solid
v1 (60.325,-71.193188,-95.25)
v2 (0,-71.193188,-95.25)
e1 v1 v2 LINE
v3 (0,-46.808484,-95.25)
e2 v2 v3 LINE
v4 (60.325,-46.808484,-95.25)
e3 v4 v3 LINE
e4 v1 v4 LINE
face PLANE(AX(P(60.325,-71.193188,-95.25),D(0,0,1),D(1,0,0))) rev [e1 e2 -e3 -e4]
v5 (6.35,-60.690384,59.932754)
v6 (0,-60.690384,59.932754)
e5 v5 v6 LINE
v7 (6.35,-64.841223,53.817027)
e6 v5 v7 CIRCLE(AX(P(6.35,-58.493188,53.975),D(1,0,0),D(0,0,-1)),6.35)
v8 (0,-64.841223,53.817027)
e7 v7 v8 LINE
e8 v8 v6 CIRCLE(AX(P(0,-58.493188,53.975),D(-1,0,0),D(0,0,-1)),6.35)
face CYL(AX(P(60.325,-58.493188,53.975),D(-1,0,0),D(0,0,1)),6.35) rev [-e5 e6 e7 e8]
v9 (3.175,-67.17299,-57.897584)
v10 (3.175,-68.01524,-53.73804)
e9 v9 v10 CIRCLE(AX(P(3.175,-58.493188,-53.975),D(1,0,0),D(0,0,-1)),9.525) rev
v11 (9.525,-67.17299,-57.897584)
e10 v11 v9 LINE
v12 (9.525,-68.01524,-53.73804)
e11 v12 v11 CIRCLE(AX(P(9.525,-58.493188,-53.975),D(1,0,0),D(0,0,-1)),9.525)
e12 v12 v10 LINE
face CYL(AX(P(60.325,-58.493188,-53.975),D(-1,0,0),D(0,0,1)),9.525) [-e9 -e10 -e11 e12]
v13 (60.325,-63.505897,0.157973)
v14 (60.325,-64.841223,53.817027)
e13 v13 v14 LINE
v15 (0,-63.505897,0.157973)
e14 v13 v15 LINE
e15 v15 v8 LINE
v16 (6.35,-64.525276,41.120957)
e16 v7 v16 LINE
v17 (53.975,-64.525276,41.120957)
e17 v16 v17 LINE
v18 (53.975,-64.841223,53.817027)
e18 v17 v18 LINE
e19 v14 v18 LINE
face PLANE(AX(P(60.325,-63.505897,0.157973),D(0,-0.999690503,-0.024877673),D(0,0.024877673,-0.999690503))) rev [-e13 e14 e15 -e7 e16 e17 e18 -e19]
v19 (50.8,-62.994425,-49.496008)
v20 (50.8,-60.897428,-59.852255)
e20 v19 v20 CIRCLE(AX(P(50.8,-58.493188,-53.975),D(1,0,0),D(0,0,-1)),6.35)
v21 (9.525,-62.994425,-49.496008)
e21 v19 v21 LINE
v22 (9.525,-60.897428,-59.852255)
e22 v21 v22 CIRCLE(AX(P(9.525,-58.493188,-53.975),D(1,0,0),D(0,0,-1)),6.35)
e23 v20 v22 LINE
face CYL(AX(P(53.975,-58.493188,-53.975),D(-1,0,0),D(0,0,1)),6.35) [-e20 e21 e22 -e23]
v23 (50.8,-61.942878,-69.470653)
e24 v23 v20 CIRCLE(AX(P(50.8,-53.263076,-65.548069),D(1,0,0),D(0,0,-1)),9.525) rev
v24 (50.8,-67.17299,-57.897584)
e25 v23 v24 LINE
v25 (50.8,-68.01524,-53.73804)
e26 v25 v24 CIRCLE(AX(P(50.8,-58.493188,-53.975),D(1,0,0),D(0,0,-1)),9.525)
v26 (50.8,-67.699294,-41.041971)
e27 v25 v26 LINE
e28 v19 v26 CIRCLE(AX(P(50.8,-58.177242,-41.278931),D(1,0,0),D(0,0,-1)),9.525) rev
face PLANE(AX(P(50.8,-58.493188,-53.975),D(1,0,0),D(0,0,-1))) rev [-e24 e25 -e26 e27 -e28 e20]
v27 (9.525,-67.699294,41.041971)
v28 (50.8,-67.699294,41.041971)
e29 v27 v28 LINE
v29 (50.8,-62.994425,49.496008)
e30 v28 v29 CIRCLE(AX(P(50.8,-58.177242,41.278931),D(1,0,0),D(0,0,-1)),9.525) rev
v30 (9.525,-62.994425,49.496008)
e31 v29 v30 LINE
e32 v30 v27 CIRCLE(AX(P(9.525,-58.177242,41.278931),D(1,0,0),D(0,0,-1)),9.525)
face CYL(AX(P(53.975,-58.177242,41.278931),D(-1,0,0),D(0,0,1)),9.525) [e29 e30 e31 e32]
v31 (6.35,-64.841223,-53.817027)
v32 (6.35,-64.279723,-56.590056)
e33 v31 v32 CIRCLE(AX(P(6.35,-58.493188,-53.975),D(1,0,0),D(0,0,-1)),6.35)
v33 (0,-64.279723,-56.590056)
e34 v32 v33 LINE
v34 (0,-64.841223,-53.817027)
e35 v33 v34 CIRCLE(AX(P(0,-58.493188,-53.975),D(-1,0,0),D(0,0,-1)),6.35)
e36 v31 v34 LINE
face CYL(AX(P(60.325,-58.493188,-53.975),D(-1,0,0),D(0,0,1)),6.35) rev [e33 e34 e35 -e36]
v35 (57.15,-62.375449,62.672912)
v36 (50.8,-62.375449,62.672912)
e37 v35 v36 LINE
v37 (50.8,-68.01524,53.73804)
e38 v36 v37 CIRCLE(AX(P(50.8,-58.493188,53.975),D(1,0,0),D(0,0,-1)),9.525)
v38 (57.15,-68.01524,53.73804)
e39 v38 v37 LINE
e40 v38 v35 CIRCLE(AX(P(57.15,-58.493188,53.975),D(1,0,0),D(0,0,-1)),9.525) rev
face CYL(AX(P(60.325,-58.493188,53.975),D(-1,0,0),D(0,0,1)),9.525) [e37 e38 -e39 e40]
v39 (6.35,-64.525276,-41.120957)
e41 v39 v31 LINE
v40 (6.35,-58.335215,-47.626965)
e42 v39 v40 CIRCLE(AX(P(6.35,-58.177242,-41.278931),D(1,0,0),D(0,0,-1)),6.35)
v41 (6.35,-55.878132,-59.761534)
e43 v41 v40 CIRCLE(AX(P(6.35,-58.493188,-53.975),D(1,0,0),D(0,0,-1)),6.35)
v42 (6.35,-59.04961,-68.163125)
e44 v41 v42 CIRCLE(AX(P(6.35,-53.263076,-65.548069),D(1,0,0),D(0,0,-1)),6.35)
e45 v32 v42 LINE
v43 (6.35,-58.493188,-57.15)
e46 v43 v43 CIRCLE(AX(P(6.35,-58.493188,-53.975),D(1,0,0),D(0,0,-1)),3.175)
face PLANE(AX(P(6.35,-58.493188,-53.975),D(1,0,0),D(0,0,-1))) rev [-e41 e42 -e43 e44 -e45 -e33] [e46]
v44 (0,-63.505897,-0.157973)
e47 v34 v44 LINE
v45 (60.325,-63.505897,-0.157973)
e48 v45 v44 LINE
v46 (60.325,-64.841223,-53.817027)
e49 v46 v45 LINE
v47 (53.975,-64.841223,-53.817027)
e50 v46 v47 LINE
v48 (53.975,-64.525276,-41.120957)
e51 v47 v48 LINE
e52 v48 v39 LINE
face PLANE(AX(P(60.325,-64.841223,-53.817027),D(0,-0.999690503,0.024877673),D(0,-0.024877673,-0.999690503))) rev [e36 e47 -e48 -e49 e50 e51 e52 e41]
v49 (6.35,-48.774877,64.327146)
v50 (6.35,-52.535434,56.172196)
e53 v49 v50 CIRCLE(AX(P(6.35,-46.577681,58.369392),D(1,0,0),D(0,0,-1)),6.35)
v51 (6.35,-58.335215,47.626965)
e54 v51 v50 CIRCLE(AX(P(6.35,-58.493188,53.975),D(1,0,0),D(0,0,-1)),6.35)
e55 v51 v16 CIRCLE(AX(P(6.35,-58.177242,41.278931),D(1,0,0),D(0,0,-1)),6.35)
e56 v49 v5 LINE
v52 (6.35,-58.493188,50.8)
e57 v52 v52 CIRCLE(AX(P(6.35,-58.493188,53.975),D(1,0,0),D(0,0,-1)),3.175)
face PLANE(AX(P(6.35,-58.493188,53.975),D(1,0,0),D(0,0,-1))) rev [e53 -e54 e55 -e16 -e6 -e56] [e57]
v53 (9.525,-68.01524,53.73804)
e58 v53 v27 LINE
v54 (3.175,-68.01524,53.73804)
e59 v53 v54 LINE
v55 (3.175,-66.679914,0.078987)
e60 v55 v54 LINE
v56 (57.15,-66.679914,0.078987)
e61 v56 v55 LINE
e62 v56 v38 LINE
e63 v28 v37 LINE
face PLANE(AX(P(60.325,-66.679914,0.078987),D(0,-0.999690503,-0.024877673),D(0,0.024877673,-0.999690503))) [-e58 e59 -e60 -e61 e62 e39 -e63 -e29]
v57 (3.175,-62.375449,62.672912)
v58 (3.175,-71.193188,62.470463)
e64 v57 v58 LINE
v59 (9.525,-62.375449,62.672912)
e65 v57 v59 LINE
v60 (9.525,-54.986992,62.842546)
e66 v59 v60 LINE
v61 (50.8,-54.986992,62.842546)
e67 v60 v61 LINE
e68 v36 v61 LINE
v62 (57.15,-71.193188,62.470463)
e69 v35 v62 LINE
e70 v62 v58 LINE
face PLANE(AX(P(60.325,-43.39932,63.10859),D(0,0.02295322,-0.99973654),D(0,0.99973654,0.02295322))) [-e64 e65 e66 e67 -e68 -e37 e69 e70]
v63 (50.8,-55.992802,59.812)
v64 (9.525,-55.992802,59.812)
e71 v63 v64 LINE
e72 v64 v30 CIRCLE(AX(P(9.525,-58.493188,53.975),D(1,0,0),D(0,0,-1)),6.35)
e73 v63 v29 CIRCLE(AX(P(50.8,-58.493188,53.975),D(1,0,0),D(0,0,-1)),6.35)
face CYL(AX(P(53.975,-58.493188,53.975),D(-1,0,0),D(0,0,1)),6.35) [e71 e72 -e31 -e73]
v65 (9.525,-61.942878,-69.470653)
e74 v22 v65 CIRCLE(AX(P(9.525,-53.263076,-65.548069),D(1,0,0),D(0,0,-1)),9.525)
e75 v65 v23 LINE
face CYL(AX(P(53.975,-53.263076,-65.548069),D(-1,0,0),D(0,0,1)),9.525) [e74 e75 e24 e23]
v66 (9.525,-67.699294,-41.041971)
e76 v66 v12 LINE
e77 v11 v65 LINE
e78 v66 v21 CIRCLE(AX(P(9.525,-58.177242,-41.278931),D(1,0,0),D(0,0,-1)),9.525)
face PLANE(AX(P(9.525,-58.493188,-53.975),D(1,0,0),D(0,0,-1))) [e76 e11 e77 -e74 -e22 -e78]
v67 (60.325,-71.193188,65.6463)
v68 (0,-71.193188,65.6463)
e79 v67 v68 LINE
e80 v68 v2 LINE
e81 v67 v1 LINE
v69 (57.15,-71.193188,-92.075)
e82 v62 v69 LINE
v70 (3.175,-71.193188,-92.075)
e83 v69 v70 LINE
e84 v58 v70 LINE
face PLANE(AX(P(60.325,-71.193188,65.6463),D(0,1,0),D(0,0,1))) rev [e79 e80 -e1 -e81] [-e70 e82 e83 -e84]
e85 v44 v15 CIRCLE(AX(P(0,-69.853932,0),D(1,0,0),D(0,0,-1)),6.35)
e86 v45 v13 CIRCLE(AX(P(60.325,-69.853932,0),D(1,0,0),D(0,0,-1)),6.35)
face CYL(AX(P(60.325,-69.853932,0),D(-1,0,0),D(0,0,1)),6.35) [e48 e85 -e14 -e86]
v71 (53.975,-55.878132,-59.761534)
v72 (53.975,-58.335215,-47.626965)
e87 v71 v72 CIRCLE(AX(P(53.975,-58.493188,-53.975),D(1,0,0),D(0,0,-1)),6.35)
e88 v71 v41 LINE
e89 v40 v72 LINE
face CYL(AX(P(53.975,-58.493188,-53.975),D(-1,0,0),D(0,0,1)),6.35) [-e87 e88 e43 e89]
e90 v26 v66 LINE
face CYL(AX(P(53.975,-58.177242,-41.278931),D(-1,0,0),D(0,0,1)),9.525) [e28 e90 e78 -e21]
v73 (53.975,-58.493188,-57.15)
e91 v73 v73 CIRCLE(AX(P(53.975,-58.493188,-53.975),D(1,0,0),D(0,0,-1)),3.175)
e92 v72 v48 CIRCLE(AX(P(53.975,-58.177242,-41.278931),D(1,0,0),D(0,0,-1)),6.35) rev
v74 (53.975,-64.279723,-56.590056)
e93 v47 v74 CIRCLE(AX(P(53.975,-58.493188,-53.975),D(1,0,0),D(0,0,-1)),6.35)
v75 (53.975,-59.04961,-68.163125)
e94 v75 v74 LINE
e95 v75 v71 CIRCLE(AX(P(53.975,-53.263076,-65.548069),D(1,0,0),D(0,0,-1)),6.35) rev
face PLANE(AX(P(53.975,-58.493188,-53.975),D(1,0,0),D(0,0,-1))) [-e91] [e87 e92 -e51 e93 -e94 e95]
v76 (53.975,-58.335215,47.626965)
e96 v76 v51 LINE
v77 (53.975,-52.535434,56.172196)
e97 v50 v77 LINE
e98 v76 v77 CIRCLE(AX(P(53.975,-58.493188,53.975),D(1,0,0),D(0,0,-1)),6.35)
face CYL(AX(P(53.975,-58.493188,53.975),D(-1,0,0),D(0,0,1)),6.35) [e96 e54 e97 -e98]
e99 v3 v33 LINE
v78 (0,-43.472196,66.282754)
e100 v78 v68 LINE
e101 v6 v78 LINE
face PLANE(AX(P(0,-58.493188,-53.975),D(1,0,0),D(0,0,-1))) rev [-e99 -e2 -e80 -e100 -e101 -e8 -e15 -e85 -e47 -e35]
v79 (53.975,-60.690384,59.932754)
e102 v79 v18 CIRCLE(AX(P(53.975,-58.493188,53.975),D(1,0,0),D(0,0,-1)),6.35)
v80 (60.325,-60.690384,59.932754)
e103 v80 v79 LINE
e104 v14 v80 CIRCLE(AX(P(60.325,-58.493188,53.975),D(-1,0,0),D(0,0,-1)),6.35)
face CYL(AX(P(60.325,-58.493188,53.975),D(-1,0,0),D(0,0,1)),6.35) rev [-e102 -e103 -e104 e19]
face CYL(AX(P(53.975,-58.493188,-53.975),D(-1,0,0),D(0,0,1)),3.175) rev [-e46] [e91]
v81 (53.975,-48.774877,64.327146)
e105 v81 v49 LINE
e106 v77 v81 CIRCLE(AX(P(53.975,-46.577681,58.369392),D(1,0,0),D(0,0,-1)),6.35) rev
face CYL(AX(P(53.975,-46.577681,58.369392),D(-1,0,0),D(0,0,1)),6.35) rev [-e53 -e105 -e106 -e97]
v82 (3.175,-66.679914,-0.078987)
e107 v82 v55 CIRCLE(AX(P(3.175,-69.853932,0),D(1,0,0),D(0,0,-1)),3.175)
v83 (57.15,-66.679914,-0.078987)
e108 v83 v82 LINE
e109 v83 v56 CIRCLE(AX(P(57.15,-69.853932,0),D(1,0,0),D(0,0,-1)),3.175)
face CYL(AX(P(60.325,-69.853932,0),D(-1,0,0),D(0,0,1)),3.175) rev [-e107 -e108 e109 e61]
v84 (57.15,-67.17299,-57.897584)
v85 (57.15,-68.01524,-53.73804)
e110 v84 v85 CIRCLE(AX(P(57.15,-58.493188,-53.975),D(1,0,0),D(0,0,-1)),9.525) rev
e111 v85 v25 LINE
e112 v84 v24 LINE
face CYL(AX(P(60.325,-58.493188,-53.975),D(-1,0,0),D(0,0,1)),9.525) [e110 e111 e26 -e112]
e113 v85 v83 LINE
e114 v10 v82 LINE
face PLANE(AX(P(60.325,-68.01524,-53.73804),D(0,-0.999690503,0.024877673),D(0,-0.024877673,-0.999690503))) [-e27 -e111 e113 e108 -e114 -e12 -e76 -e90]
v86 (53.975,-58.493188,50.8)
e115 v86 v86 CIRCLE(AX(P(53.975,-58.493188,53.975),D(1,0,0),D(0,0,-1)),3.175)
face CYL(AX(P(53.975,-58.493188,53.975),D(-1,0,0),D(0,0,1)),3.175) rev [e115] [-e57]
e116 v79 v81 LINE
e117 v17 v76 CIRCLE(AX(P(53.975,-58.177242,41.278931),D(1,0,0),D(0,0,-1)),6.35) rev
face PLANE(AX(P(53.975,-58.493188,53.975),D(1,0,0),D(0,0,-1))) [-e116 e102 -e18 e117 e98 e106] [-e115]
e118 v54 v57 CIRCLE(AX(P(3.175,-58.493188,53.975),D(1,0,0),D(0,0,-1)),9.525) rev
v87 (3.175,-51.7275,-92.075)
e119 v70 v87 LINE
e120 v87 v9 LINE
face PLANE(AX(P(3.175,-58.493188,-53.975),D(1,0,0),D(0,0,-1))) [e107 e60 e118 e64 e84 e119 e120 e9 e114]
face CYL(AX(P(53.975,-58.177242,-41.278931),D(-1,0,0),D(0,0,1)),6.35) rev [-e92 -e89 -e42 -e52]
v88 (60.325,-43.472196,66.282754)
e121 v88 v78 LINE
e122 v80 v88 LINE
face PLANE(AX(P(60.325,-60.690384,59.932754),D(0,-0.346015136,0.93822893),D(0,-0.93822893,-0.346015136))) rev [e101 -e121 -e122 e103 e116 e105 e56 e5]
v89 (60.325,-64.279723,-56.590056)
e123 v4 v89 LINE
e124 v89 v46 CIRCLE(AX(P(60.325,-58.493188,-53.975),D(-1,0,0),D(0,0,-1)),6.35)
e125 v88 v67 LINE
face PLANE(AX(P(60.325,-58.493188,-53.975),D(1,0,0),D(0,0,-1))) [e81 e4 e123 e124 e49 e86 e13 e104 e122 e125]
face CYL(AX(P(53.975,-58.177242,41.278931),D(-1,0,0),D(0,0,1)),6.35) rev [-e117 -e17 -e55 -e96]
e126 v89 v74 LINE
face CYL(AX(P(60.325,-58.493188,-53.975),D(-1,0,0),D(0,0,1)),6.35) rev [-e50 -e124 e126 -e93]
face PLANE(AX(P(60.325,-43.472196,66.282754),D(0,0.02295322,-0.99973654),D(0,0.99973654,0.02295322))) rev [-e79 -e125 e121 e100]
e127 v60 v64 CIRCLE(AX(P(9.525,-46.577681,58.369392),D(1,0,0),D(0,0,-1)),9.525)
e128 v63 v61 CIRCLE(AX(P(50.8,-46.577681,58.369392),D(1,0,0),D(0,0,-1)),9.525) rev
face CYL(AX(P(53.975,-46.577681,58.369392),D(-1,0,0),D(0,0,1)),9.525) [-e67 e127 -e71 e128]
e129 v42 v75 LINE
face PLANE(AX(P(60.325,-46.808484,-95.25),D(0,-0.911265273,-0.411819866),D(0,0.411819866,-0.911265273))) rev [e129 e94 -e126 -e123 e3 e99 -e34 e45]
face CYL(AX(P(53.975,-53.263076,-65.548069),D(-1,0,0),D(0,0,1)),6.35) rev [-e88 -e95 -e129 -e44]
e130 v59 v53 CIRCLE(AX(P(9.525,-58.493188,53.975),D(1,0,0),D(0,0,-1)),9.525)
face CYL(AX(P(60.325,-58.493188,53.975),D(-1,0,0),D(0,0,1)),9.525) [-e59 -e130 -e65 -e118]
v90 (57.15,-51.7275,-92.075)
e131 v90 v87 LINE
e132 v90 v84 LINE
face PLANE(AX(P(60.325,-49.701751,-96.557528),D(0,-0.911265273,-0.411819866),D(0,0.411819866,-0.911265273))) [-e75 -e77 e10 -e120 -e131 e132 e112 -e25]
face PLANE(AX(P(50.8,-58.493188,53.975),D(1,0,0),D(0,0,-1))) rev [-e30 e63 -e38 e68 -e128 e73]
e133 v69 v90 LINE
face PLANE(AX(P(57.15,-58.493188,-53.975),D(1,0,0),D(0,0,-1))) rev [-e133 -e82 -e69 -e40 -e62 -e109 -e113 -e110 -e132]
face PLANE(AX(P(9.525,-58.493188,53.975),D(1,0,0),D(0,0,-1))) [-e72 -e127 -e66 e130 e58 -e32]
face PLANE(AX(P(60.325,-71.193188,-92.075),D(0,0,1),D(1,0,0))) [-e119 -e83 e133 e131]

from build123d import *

# Parameters (mm, degrees)
BOSS_EXTRUDE1_DEPTH = 60.324999999999996
SKETCH2_R           = 6.349999999999996
SKETCH2_R_2         = 3.174999999999997
SKETCH2_R_3         = 6.350000000000003
BOSS_EXTRUDE2_DEPTH = 23.8125
FILLET1_R           = 6.35
SHELL1_START        = 3.175
SHELL1_DEPTH        = 53.975
SHELL1_START_2      = 9.525
SHELL1_2_DEPTH      = 41.275


# Read off the part's stored shape, not the designer's step: Shell1
with BuildPart() as part:
    # Sketch1 → Boss-Extrude1 (new body)
    with BuildSketch(Plane(origin=(0, 0, 0), x_dir=(0, 0, -1), z_dir=(1, 0, 0))):
        with BuildLine():
            Line((95.25, -46.808484128263686), (56.59005614988863, -64.27972260468273))
            ThreePointArc((56.59005614988863, -64.27972260468273), (55.235212183230196, -64.71688198003586), (53.81702677554687, -64.84122281357011))
            Line((53.81702677554687, -64.84122281357011), (0.1579732244523257, -63.50589713864123))
            ThreePointArc((0.1579732244523257, -63.50589713864123), (-7.8219e-13, -63.5039318313911), (-0.15797322445388826, -63.50589713864123))
            Line((-0.15797322445388826, -63.50589713864123), (-53.817026775546886, -64.84122281357013))
            ThreePointArc((-53.817026775546886, -64.84122281357013), (-57.54105224821803, -63.747307586818266), (-59.93275370705406, -60.69038423543624))
            Line((-59.93275370705406, -60.69038423543624), (-66.28275370705404, -43.47219611461599))
            Line((-66.28275370705404, -43.47219611461599), (-65.6463, -71.1931881208203))
            Line((-65.6463, -71.1931881208203), (95.25, -71.19318812082028))
            Line((95.25, -71.19318812082028), (95.25, -46.808484128263686))
        make_face()
    extrude(amount=BOSS_EXTRUDE1_DEPTH)

    # Sketch2 → Boss-Extrude2 (add, symmetric)
    # profile 1 of 2: a face of its own
    with BuildSketch(Plane(origin=(30.162499999999998, 0, 0), x_dir=(0, 0, -1), z_dir=(1, 0, 0))):
        with Locations((-53.975, -58.49318812082027)):
            Circle(SKETCH2_R)
        with Locations((-53.975, -58.49318812082027)):
            Circle(SKETCH2_R_2, mode=Mode.SUBTRACT)
    # profile 2 of 2: a face of its own
    with BuildSketch(Plane(origin=(30.162499999999998, 0, 0), x_dir=(0, 0, -1), z_dir=(1, 0, 0))):
        with Locations((53.97499999999999, -58.49318812082027)):
            Circle(SKETCH2_R_3)
        with Locations((53.97499999999999, -58.49318812082027)):
            Circle(SKETCH2_R_2, mode=Mode.SUBTRACT)
    extrude(amount=BOSS_EXTRUDE2_DEPTH, both=True)

    # Fillet1
    fillet1_edges = [part.edges().sort_by_distance(p)[0] for p in [
        (30.162499999999998, -60.69038423543624, 59.93275370705406),
        (30.162499999999998, -64.84122281357013, 53.817026775546886),
        (30.162499999999998, -64.27972260468273, -56.59005614988863),
        (30.162499999999998, -64.84122281357011, -53.81702677554687),
    ]]
    fillet(fillet1_edges, radius=FILLET1_R)

    # Shell1 outline → Shell1 (cut)
    with BuildSketch(Plane.YZ.offset(SHELL1_START)):
        with BuildLine():
            Line((-66.679914485, 0.078986612), (-68.01524016, 53.738040163))
            ThreePointArc((-68.01524016, 53.738040163), (-66.547807009, 59.059165573), (-62.375448989, 62.672912138))
            Line((-62.375448989, 62.672912138), (-71.193188121, 62.470463295))
            Line((-71.193188121, 62.470463295), (-71.193188121, -92.075))
            Line((-71.193188121, -92.075), (-51.727499707, -92.075))
            Line((-51.727499707, -92.075), (-67.172989847, -57.897584225))
            ThreePointArc((-67.172989847, -57.897584225), (-67.82872891, -55.865318275), (-68.01524016, -53.738040163))
            Line((-68.01524016, -53.738040163), (-66.679914485, -0.078986612))
            ThreePointArc((-66.679914485, -0.078986612), (-66.678931831, 0), (-66.679914485, 0.078986612))
        make_face()
    extrude(amount=SHELL1_DEPTH, mode=Mode.SUBTRACT)

    # Shell1 2 outline → Shell1 2 (cut)
    with BuildSketch(Plane.YZ.offset(SHELL1_START_2)):
        with BuildLine():
            ThreePointArc((-67.699293711, 41.041970778), (-66.500168266, 45.910832805), (-62.99442515, 49.496008461))
            ThreePointArc((-62.99442515, 49.496008461), (-63.747307587, 57.541052248), (-55.99280194, 59.811999995))
            ThreePointArc((-55.99280194, 59.811999995), (-55.617794314, 61.369720704), (-54.986992393, 62.842545699))
            Line((-54.986992393, 62.842545699), (-62.375448989, 62.672912138))
            ThreePointArc((-62.375448989, 62.672912138), (-66.547807009, 59.059165573), (-68.01524016, 53.738040163))
            Line((-68.01524016, 53.738040163), (-67.699293711, 41.041970778))
        make_face()
        with BuildLine():
            ThreePointArc((-62.99442515, -49.496008461), (-66.500168266, -45.910832805), (-67.699293711, -41.041970778))
            Line((-67.699293711, -41.041970778), (-68.01524016, -53.738040163))
            ThreePointArc((-68.01524016, -53.738040163), (-67.82872891, -55.865318275), (-67.172989847, -57.897584225))
            Line((-67.172989847, -57.897584225), (-61.942877547, -69.470653193))
            ThreePointArc((-61.942877547, -69.470653193), (-62.732304839, -64.518832939), (-60.897427959, -59.85225538))
            ThreePointArc((-60.897427959, -59.85225538), (-64.71688198, -55.235212183), (-62.99442515, -49.496008461))
        make_face()
    extrude(amount=SHELL1_2_DEPTH, mode=Mode.SUBTRACT)


solid = part.part
